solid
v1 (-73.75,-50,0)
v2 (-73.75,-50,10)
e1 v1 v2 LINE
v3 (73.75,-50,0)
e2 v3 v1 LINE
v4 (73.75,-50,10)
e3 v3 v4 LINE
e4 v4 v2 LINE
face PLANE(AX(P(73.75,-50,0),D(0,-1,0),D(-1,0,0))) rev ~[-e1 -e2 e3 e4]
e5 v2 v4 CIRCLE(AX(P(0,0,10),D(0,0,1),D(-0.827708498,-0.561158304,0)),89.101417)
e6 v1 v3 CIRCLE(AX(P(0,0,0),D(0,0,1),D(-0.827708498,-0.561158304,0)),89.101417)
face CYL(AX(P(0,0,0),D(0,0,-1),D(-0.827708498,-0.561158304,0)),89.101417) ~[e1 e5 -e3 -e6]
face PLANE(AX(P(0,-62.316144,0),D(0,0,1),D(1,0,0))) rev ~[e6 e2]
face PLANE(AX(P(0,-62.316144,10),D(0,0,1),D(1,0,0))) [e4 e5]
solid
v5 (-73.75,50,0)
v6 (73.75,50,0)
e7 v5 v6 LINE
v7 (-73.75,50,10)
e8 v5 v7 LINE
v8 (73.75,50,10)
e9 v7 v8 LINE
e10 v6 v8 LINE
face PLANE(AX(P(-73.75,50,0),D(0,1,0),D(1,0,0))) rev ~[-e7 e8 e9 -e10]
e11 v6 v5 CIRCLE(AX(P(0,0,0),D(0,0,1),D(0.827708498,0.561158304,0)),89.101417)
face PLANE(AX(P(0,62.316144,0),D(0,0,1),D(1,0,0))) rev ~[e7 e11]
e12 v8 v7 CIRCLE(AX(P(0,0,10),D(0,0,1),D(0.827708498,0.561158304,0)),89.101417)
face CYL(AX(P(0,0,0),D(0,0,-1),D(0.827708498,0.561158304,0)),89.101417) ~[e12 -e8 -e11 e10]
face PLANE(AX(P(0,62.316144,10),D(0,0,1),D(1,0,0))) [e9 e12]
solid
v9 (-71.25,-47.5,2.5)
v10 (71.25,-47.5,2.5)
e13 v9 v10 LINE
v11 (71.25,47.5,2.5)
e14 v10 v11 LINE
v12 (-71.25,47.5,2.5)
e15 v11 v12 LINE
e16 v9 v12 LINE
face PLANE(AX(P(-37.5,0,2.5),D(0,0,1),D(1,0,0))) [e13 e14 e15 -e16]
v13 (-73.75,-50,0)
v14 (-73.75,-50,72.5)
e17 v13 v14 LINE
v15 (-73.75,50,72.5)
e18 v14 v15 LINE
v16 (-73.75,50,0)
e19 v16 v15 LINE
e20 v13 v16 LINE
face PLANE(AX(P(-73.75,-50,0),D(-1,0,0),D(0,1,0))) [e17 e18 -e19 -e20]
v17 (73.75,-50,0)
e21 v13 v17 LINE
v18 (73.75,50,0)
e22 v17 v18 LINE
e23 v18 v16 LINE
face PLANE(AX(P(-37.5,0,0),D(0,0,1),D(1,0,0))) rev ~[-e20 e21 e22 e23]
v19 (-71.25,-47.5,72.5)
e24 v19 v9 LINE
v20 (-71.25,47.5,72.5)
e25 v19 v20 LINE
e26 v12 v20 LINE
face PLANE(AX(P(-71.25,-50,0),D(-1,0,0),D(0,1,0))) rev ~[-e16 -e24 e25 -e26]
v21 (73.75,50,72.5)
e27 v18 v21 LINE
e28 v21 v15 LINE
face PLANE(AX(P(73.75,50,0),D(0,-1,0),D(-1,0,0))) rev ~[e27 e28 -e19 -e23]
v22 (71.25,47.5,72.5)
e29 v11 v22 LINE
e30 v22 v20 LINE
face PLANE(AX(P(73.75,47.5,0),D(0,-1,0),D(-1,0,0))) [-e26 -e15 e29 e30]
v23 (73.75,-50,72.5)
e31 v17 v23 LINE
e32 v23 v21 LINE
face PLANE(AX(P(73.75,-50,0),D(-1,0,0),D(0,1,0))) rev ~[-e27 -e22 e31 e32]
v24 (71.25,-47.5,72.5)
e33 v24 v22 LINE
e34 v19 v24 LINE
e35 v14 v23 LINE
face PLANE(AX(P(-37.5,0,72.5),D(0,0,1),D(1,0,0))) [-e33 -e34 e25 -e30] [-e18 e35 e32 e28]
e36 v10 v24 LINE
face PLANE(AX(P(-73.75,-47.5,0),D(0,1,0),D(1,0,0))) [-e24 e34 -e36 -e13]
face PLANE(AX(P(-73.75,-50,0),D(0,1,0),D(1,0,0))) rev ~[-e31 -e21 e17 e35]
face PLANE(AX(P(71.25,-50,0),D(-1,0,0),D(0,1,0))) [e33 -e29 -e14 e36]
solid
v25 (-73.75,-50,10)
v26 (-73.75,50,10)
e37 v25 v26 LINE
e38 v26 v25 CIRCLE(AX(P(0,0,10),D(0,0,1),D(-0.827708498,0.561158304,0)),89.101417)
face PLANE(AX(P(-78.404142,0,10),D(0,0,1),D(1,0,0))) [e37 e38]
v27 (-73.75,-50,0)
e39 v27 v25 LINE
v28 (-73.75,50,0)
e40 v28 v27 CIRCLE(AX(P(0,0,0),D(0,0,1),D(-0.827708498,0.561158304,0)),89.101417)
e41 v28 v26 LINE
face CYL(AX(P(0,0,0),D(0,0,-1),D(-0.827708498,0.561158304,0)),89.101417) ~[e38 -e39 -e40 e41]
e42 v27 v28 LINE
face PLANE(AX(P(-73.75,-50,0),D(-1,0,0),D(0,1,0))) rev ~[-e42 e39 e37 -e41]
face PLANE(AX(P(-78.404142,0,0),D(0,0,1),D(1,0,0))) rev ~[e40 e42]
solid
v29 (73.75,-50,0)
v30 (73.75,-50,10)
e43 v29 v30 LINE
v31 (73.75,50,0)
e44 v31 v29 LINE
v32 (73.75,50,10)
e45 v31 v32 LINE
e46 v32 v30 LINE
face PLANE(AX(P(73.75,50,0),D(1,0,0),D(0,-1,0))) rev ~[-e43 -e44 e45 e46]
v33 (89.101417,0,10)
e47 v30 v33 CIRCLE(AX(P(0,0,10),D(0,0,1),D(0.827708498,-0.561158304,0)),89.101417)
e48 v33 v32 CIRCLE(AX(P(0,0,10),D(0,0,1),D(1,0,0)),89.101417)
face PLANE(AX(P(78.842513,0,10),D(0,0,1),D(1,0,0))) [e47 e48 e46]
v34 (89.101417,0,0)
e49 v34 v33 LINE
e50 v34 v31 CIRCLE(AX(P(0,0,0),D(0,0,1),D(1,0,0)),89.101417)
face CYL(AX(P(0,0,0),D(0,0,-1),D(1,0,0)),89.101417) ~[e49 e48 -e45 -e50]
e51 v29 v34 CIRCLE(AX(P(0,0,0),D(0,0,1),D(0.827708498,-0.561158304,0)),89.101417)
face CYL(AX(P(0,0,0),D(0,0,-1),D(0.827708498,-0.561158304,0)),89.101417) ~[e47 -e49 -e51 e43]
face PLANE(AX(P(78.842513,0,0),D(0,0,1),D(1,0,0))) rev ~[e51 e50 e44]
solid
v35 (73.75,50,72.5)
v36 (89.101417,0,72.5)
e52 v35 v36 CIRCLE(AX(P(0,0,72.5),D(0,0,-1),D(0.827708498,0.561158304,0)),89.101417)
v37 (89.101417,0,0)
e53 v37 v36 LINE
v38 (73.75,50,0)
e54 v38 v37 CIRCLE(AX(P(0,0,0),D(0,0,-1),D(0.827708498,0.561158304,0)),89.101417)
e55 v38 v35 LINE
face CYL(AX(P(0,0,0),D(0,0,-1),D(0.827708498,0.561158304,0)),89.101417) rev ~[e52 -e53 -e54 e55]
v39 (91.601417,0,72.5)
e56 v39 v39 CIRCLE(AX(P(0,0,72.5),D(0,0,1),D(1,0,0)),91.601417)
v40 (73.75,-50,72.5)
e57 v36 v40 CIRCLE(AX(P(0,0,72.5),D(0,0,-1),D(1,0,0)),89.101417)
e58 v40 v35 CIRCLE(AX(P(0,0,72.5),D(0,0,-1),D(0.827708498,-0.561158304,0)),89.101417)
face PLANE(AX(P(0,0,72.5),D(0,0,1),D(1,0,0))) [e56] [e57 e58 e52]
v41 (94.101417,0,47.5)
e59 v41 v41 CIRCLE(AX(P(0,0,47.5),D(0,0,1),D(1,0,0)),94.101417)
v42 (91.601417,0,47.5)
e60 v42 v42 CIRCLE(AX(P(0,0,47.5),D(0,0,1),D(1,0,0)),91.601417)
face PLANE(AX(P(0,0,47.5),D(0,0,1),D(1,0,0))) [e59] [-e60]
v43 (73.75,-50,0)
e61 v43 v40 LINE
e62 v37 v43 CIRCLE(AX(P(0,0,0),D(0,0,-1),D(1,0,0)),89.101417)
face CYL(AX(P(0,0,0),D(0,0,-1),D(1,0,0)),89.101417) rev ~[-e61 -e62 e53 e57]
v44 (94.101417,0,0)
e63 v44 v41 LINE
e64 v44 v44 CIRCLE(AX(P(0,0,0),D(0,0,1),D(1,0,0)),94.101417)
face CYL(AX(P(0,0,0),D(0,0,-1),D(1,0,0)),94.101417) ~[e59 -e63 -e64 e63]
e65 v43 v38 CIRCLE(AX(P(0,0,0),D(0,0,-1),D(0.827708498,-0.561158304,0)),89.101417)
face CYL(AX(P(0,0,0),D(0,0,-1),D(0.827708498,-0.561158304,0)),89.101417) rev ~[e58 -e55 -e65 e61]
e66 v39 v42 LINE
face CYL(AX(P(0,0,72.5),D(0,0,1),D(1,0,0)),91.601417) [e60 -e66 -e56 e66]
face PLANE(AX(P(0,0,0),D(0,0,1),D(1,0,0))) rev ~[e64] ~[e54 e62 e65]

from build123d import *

# Parameters (mm, degrees)
F0_R     = 94.101416936
F1_DEPTH = 72.5
F0_W     = 72.5
F0_H     = 100
F0_W_2   = 2.5
F2_T     = -2.5
F4_DEPTH = 10
F5_R     = 94.101416936
F5_R_2   = 91.601416936
F6_DEPTH = 25


# Not quite as in the source:
# - the program builds the solid bodies; features that only make, move or delete a surface that nothing else refers to are left out


with BuildPart() as f1:
    # F0 (on Top) → F1 (new body)
    with BuildSketch(Plane.XY):
        Circle(F0_R)
        with BuildLine():
            ThreePointArc((89.101416936, 0), (85.177144819, -26.1517972707), (73.75, -50))
            ThreePointArc((73.75, -50), (0, -89.101416936), (-73.75, -50))
            ThreePointArc((-73.75, -50), (-89.101416936, 0), (-73.75, 50))
            ThreePointArc((-73.75, 50), (0, 89.101416936), (73.75, 50))
            ThreePointArc((73.75, 50), (85.177144819, 26.1517972707), (89.101416936, 0))
        make_face(mode=Mode.SUBTRACT)
    extrude(amount=F1_DEPTH)

    # F5 (on face) → F6 (cut)
    with BuildSketch(Plane.XY.offset(72.5)):
        Circle(F5_R)
        Circle(F5_R_2, mode=Mode.SUBTRACT)
    extrude(amount=-F6_DEPTH, mode=Mode.SUBTRACT)


with BuildPart() as f1b:
    # F0 (on Top) → F1, piece 2 (new body)
    with BuildSketch(Plane.XY):
        with Locations((-37.5, 0)):
            Rectangle(F0_W, F0_H)
        with Locations((37.5, 0)):
            Rectangle(F0_W, F0_H)
        Rectangle(F0_W_2, F0_H)
    extrude(amount=F1_DEPTH)

    # F2
    f2_openings = [f1b.faces().sort_by_distance(p)[0] for p in [
        (0, 0, 72.5),
    ]]
    offset(amount=F2_T, openings=f2_openings)


with BuildPart() as f4:
    # F0 (on Top) → F4 (new body)
    with BuildSketch(Plane.XY):
        with BuildLine():
            ThreePointArc((-73.75, 50), (-89.101416936, 0), (-73.75, -50))
            Line((-73.75, -50), (-73.75, 50))
        make_face()
    extrude(amount=F4_DEPTH)


with BuildPart() as f4b:
    # F0 (on Top) → F4, piece 2 (new body)
    with BuildSketch(Plane.XY):
        with BuildLine():
            Line((73.75, 50), (73.75, -50))
            ThreePointArc((73.75, -50), (85.177144819, -26.1517972707), (89.101416936, 0))
            ThreePointArc((89.101416936, 0), (85.177144819, 26.1517972707), (73.75, 50))
        make_face()
    extrude(amount=F4_DEPTH)


with BuildPart() as f4c:
    # F0 (on Top) → F4, piece 3 (new body)
    with BuildSketch(Plane.XY):
        with BuildLine():
            Line((1.25, 50), (73.75, 50))
            ThreePointArc((73.75, 50), (0, 89.101416936), (-73.75, 50))
            Line((-73.75, 50), (-1.25, 50))
            Line((-1.25, 50), (1.25, 50))
        make_face()
    extrude(amount=F4_DEPTH)


with BuildPart() as f4d:
    # F0 (on Top) → F4, piece 4 (new body)
    with BuildSketch(Plane.XY):
        with BuildLine():
            ThreePointArc((-73.75, -50), (0, -89.101416936), (73.75, -50))
            Line((73.75, -50), (1.25, -50))
            Line((1.25, -50), (-1.25, -50))
            Line((-1.25, -50), (-73.75, -50))
        make_face()
    extrude(amount=F4_DEPTH)


solid = Compound([f1.part, f1b.part, f4.part, f4b.part, f4c.part, f4d.part])
